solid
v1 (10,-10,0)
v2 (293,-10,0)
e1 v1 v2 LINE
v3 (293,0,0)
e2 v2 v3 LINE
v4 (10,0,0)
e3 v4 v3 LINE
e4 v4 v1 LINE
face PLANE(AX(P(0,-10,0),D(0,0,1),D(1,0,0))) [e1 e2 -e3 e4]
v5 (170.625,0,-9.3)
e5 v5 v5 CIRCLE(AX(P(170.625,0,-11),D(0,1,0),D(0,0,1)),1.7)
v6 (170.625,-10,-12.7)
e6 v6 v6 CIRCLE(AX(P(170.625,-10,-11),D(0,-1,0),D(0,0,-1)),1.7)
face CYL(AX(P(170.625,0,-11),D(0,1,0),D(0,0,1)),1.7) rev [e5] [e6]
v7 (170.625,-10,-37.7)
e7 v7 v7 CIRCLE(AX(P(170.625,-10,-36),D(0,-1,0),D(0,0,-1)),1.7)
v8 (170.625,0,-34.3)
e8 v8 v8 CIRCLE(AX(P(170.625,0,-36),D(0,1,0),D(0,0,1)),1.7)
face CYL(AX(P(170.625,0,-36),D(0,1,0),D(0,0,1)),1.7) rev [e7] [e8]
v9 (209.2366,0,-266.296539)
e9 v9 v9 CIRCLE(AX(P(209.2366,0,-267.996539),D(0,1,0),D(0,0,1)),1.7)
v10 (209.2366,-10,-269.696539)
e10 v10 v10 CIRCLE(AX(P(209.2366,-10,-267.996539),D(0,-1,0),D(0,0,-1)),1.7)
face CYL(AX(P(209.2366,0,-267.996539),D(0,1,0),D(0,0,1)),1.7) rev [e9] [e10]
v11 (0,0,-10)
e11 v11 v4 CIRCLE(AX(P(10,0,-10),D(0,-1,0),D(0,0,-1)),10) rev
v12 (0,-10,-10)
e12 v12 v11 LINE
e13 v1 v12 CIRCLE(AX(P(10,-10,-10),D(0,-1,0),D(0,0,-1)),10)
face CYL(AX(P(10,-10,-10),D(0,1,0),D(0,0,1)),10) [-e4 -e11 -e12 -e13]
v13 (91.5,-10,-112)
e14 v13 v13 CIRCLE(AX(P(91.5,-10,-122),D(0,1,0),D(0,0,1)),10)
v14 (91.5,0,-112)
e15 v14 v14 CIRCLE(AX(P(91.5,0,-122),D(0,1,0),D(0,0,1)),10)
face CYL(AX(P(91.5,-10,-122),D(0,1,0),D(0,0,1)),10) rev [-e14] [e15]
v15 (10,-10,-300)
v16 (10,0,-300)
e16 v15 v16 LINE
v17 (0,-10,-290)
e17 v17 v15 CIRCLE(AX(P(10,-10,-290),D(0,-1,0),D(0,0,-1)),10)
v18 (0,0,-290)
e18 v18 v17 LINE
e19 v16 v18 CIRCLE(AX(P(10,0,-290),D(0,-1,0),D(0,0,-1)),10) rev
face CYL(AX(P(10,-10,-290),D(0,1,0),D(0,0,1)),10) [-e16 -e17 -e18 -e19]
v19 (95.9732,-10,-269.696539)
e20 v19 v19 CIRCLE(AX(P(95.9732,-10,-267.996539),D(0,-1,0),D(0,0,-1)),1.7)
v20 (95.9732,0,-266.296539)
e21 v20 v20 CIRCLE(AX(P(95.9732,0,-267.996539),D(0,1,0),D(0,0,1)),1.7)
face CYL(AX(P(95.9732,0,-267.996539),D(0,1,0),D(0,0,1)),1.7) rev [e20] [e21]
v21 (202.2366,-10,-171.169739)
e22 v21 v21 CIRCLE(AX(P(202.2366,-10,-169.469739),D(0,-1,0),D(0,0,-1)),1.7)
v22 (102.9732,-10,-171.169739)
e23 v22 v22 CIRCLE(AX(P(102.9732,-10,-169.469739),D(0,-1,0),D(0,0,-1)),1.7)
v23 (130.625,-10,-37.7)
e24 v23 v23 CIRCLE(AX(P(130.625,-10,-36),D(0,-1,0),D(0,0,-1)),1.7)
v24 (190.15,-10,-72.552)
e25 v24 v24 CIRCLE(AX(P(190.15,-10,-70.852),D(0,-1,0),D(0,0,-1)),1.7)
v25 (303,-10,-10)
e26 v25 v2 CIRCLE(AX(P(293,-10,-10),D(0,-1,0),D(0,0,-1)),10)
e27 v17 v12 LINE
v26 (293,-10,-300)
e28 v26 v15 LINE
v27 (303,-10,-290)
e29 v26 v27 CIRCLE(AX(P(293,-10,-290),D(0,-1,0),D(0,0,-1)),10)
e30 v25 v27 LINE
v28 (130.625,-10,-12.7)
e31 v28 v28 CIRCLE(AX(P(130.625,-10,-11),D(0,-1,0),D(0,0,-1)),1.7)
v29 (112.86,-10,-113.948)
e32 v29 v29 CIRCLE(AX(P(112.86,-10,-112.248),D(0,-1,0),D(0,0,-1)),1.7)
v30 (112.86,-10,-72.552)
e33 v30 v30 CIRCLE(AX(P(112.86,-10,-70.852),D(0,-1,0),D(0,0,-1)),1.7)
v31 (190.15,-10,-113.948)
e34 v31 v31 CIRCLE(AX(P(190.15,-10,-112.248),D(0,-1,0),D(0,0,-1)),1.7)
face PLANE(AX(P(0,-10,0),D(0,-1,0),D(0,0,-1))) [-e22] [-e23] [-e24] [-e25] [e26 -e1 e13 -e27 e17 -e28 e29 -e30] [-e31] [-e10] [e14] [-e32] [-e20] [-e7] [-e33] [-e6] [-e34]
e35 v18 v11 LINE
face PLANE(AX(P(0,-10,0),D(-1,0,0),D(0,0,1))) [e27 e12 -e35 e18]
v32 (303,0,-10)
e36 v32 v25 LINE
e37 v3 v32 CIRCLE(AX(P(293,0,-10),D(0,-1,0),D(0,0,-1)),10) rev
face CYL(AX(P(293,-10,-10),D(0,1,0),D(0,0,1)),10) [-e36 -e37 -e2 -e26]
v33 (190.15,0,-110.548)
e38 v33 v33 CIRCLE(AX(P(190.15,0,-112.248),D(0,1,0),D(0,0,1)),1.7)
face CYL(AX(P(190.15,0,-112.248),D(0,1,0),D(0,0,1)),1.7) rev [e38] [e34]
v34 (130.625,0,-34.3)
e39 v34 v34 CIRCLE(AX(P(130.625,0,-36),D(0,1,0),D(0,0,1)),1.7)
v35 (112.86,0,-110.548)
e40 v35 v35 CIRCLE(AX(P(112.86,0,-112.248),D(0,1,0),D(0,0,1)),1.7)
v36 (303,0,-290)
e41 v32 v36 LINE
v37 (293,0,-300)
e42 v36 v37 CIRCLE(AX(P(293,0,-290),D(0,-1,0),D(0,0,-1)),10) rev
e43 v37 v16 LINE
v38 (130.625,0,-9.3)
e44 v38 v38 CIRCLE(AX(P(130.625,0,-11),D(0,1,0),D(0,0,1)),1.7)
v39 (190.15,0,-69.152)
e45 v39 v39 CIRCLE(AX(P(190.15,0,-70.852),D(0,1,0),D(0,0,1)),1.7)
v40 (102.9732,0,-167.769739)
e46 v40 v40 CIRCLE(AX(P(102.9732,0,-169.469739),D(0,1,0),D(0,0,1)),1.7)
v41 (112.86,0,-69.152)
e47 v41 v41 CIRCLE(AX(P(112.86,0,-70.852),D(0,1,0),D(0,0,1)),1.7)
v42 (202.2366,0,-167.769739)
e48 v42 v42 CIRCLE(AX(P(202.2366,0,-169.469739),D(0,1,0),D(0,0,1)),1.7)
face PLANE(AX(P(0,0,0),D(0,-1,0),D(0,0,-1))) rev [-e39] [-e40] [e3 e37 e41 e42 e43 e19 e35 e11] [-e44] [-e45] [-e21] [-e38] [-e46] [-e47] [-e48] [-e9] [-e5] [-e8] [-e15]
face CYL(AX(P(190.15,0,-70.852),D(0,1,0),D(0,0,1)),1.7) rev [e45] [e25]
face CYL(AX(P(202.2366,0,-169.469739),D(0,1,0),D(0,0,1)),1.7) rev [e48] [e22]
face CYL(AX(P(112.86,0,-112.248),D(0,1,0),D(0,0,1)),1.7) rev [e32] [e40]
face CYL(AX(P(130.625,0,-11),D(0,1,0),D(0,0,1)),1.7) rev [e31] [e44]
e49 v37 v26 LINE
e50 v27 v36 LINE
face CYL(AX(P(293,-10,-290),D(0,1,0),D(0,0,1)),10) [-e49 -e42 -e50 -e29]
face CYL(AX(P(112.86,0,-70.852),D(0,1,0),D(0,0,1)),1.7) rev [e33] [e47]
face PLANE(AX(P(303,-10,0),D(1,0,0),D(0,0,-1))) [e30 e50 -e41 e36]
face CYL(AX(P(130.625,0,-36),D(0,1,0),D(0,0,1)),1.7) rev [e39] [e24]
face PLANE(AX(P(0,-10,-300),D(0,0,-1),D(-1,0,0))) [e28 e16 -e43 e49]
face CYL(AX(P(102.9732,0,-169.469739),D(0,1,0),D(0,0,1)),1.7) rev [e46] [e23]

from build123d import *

# Parameters (mm, degrees)
SKETCH1_W                = 303
SKETCH1_H                = 300
BASE_FLANGE1_DEPTH       = 10
FILLET1_R                = 10
M3_CLEARANCE_HOLE1_D     = 3.4
M3_CLEARANCE_HOLE1_DEPTH = 50
M3_CLEARANCE_HOLE1_TIP   = 1.021463052
M3_CLEARANCE_HOLE2_D     = 3.4
M3_CLEARANCE_HOLE2_DEPTH = 28.71
M3_CLEARANCE_HOLE2_TIP   = 1.021463052
WIREHOLE_R               = 10
CUT_EXTRUDE1_DEPTH       = 10
M3_CLEARANCE_HOLE3_D     = 3.4
M3_CLEARANCE_HOLE3_DEPTH = 28.71
M3_CLEARANCE_HOLE3_TIP   = 1.021463052


# Sheet-metal steps are written as plain solids
with BuildPart() as part:
    # Sketch1 → Base-Flange1 (new body)
    with BuildSketch(Plane(origin=(0, 0, 0), x_dir=(1, 0, 0), z_dir=(0, 1, 0))):
        with Locations((151.5, 150)):
            Rectangle(SKETCH1_W, SKETCH1_H)
    extrude(amount=-BASE_FLANGE1_DEPTH)

    # Fillet1
    fillet1_edges = [part.edges().sort_by_distance(p)[0] for p in [
        (0, -5, -300),
        (303, -5, -300),
        (303, -5, 0),
        (0, -5, 0),
    ]]
    fillet(fillet1_edges, radius=FILLET1_R)

    # M3 Clearance Hole1
    with Locations(Plane(origin=(0, 0, 0), x_dir=(1, 0, 0), z_dir=(0, 1, 0))):
        with Locations((202.2366, 169.469739333), (102.9732, 169.469739333), (95.9732, 267.996539333), (209.2366, 267.996539333)):
            Hole(M3_CLEARANCE_HOLE1_D / 2, depth=M3_CLEARANCE_HOLE1_DEPTH)
            with Locations((0, 0, -(M3_CLEARANCE_HOLE1_DEPTH + M3_CLEARANCE_HOLE1_TIP / 2))):  # 118° drill point
                Cone(0, M3_CLEARANCE_HOLE1_D / 2, M3_CLEARANCE_HOLE1_TIP, mode=Mode.SUBTRACT)

    # M3 Clearance Hole2
    with Locations(Plane(origin=(0, 0, 0), x_dir=(1, 0, 0), z_dir=(0, 1, 0))):
        with Locations((130.625, 11), (170.625, 11), (130.625, 36), (170.625, 36)):
            Hole(M3_CLEARANCE_HOLE2_D / 2, depth=M3_CLEARANCE_HOLE2_DEPTH)
            with Locations((0, 0, -(M3_CLEARANCE_HOLE2_DEPTH + M3_CLEARANCE_HOLE2_TIP / 2))):  # 118° drill point
                Cone(0, M3_CLEARANCE_HOLE2_D / 2, M3_CLEARANCE_HOLE2_TIP, mode=Mode.SUBTRACT)

    # WireHole → Cut-Extrude1 (cut)
    with BuildSketch(Plane(origin=(0, 0, 0), x_dir=(1, 0, 0), z_dir=(0, 1, 0))):
        with Locations(Location((91.5, 122, 0), (0, 0, 270))):
            Circle(WIREHOLE_R)
    extrude(amount=-CUT_EXTRUDE1_DEPTH, mode=Mode.SUBTRACT)

    # M3 Clearance Hole3
    with Locations(Plane(origin=(0, 0, 0), x_dir=(1, 0, 0), z_dir=(0, 1, 0))):
        with Locations((190.15, 70.852), (190.15, 112.248), (112.86, 70.852), (112.86, 112.248)):
            Hole(M3_CLEARANCE_HOLE3_D / 2, depth=M3_CLEARANCE_HOLE3_DEPTH)
            with Locations((0, 0, -(M3_CLEARANCE_HOLE3_DEPTH + M3_CLEARANCE_HOLE3_TIP / 2))):  # 118° drill point
                Cone(0, M3_CLEARANCE_HOLE3_D / 2, M3_CLEARANCE_HOLE3_TIP, mode=Mode.SUBTRACT)


solid = part.part
